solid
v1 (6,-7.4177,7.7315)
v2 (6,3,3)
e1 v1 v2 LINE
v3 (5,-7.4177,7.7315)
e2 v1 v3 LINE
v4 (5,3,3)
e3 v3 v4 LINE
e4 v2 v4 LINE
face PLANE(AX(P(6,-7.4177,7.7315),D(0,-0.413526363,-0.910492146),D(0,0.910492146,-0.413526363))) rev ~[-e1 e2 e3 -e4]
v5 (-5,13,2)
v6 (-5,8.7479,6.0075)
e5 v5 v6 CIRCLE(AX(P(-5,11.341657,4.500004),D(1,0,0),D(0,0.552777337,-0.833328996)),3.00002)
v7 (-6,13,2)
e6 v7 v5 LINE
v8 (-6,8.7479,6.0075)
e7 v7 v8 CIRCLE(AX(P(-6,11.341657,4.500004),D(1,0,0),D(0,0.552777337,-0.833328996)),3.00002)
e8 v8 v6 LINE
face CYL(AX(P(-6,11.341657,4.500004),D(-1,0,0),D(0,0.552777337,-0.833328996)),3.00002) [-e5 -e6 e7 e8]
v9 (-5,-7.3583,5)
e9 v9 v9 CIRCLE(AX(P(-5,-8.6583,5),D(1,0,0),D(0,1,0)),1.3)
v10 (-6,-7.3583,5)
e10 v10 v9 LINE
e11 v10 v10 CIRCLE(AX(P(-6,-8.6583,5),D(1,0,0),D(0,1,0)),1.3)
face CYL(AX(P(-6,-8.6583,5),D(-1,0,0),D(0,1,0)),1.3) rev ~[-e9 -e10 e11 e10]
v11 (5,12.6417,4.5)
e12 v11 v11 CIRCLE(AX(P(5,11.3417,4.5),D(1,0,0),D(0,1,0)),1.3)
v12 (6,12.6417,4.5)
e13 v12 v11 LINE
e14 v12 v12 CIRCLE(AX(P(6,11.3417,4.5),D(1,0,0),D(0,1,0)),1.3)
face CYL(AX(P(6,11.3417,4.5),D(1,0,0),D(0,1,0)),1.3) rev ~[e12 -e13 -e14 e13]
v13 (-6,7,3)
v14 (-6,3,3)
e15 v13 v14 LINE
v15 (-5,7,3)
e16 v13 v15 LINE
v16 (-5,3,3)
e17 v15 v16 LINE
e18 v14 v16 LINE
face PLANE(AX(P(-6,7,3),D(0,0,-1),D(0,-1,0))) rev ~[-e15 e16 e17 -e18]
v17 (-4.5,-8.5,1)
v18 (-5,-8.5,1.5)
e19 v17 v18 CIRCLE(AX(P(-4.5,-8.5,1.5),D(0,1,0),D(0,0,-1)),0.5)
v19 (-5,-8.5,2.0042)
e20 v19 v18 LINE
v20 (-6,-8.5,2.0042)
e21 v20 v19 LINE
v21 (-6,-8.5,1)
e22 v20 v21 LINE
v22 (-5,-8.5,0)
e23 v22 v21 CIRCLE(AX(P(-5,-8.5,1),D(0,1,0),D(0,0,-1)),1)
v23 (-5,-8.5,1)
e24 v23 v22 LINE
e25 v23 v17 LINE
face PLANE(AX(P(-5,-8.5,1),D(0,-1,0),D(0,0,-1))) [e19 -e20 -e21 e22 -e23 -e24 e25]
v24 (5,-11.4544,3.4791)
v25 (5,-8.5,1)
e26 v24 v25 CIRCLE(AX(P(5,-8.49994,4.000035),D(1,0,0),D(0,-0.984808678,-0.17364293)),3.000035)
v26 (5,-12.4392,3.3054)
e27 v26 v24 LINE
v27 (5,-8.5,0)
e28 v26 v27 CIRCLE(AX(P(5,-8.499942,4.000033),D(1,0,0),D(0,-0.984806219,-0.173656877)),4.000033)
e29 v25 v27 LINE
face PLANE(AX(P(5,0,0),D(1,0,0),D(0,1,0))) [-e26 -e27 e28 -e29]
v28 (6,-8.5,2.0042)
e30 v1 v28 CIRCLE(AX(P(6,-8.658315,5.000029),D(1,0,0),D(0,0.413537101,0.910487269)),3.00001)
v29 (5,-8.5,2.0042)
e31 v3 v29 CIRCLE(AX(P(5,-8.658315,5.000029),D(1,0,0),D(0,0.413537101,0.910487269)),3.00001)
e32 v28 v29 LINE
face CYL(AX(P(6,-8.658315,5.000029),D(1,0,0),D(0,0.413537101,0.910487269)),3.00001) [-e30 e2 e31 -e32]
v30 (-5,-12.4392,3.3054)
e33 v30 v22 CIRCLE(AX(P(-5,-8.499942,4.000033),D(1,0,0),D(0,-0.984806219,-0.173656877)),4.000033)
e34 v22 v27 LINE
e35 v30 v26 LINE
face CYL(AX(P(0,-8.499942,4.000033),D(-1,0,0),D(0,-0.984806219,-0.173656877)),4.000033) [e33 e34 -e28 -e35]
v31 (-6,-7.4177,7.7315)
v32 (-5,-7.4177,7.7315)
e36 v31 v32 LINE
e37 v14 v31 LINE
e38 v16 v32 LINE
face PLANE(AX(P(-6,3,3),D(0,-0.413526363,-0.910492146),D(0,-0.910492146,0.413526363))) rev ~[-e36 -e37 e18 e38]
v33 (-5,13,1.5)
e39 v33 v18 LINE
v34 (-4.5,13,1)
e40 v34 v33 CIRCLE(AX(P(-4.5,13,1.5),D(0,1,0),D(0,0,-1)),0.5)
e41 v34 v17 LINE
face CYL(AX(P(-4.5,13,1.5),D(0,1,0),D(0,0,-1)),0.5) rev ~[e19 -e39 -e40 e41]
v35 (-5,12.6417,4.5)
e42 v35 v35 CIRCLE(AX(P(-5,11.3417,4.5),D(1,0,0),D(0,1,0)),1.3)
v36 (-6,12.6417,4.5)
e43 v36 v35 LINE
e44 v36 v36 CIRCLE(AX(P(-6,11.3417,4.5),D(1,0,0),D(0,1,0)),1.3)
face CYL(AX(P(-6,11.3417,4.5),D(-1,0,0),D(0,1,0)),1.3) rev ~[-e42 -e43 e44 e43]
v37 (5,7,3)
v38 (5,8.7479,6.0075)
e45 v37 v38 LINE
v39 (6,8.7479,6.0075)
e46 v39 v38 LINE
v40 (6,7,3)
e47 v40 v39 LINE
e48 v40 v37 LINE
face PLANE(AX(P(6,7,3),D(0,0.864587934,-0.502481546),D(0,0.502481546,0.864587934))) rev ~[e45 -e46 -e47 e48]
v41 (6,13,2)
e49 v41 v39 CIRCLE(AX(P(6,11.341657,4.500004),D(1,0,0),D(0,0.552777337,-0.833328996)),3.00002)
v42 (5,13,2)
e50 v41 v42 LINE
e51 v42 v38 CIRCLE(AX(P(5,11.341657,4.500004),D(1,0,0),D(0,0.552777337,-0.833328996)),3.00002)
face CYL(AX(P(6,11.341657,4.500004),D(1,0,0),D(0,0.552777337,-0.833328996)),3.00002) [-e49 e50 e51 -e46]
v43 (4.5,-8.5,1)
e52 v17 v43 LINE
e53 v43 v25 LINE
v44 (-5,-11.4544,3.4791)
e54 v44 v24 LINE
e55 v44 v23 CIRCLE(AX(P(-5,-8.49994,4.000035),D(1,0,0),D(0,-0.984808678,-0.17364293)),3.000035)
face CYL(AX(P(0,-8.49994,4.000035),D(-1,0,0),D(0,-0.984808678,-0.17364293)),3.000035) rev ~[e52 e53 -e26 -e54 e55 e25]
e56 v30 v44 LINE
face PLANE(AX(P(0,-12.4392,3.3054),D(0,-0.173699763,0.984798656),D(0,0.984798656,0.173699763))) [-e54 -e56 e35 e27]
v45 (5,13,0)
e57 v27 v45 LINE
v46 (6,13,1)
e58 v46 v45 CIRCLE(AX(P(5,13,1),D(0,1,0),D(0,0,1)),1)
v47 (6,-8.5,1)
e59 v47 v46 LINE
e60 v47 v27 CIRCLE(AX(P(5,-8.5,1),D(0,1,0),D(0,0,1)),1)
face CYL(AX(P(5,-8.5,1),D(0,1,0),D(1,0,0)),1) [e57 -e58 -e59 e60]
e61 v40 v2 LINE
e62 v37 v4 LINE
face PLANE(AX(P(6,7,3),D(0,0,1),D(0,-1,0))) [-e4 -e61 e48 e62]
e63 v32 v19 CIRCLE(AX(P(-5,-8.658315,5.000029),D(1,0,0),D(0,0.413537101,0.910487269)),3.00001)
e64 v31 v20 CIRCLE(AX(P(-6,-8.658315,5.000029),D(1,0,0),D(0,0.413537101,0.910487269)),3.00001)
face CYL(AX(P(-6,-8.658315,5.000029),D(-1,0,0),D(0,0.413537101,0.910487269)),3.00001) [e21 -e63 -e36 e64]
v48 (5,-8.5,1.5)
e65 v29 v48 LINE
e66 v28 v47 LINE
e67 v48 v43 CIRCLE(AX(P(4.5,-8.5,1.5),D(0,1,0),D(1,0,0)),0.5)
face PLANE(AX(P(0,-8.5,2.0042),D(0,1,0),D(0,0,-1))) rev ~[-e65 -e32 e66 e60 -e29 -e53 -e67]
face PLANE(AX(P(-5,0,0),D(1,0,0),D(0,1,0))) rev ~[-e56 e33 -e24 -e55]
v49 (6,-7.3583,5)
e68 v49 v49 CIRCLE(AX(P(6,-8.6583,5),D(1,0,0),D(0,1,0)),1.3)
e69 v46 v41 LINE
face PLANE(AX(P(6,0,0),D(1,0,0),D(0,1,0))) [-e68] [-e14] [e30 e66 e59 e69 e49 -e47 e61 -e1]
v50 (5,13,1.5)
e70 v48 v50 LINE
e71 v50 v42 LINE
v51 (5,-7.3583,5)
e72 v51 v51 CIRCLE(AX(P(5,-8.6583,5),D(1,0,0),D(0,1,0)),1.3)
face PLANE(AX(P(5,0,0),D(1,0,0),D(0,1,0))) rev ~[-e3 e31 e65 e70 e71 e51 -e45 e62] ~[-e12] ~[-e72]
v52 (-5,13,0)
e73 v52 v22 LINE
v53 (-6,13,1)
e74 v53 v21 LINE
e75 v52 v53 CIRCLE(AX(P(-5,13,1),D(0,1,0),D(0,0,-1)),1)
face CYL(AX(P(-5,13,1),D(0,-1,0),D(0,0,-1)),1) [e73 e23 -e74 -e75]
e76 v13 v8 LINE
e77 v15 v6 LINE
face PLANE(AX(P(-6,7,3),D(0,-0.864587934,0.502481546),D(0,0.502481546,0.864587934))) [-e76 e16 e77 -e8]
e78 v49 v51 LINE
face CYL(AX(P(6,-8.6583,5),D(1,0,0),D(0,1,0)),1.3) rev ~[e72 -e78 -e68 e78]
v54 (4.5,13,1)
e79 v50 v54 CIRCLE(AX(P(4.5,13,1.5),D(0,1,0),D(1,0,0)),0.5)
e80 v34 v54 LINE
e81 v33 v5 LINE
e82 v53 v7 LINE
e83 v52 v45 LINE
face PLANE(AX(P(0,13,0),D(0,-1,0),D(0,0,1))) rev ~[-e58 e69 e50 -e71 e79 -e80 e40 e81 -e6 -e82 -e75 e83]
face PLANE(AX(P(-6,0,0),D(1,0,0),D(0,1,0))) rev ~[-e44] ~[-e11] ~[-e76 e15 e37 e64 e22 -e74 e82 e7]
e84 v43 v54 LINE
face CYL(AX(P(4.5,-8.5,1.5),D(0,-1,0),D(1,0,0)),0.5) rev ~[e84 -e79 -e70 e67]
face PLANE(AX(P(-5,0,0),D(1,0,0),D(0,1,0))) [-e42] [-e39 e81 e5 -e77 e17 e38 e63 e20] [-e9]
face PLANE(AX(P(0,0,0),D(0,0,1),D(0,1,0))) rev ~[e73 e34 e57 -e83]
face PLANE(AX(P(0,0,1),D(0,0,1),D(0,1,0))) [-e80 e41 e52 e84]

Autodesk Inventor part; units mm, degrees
ref_plane "YZ Plane" through (0, 0, 0) normal (1, 0, 0) x (0, 1, 0)
ref_plane "XZ Plane" through (0, 0, 0) normal (0, 1, 0) x (-1, 0, 0)
ref_plane "XY Plane" through (0, 0, 0) normal (0, 0, 1) x (1, 0, 0)
sketch "Sketch2" plane through (0, 0, 0) normal (1, 0, 0) x (0, 1, 0)
  line L0 (0, 10.4889) -> (0, -1.7482) projected
  line L1 (-17.7123, 0) -> (21.1316, 0) projected
  line L2 (13, 0) -> (13, 2)
  arc A0 (-7.4177, 7.7315) -> (-8.5, 2.0042) centre (-8.6583, 5) ccw
  line L3 (-8.5, 2.0042) -> (-8.5, 0)
  line L4 (7, 3) -> (8.7479, 6.0075)
  arc A1 (13, 2) -> (8.7479, 6.0075) centre (11.3417, 4.5) ccw
  circle A2 centre (11.3417, 4.5) radius 1.3
  circle A3 centre (-8.6583, 5) radius 1.3
  line L5 (7, 3) -> (3, 3)
  line L6 (3, 3) -> (-7.4177, 7.7315)
  dimension "d0" = 21.5
  dimension "d2" = 3
  dimension "d3" = 2
  dimension "d6" = 3
  dimension "d7" = 4.5
  dimension "d8" = 1.6583
  dimension "d9" = 5
  dimension "d10" = 20
  dimension "d16" = 3
  dimension "d17" = 2.6
  dimension "d30" = 13
  dimension "d31" = 4
  dimension "d32" = 6
extrude "Extrusion1" add sketch "Sketch2" along normal mid plane 12
fillet "Fillet1" radius 1 2 edges at (6, 2.25, 0) (-6, 2.25, 0)
shell "Shell1" thickness 1 removed faces 9 at (2, -9.3053, 7.9294) at (2, 8.1653, 5.005) at (2, 13.3771, 2.2962) at (1.6667, -8.5, 1.3361) at (-1.6667, 13, 1.3333) at (2, 12.6249, 4.2915) at (2, -7.3751, 4.7915) at (-2, -3.9452, 6.1543) at (-2, 4.3333, 3)
sketch "Sketch4" plane through (0, 0, 0) normal (1, 0, 0) x (0, 1, 0)
  arc A0 (-11.4544, 3.4791) -> (-8.5, 1) centre (-8.5, 4) ccw
  arc A1 (-12.4392, 3.3054) -> (-8.5, 0) centre (-8.5, 4) ccw
  line L0 (-12.4392, 3.3054) -> (-11.4544, 3.4791)
  line L1 (-8.5, 1) -> (-8.5, 0)
  line L2 (-8.5, 0) -> (-8.5, 1) projected
  line L3 (-8.5, 0) -> (13, 0) projected
  line L4 (13, 1) -> (-8.5, 1) projected
  dimension "d40" = 3
  dimension "d42" = 1
  dimension "d43" = 80
extrude "Extrusion3" add sketch "Sketch4" along normal mid plane 10
fillet "Fillet2" radius 0.5 2 edges at (-5, 2.25, 1) (5, 2.25, 1)
properties part number "Linkage for 45 degree hinge" material "Steel"
